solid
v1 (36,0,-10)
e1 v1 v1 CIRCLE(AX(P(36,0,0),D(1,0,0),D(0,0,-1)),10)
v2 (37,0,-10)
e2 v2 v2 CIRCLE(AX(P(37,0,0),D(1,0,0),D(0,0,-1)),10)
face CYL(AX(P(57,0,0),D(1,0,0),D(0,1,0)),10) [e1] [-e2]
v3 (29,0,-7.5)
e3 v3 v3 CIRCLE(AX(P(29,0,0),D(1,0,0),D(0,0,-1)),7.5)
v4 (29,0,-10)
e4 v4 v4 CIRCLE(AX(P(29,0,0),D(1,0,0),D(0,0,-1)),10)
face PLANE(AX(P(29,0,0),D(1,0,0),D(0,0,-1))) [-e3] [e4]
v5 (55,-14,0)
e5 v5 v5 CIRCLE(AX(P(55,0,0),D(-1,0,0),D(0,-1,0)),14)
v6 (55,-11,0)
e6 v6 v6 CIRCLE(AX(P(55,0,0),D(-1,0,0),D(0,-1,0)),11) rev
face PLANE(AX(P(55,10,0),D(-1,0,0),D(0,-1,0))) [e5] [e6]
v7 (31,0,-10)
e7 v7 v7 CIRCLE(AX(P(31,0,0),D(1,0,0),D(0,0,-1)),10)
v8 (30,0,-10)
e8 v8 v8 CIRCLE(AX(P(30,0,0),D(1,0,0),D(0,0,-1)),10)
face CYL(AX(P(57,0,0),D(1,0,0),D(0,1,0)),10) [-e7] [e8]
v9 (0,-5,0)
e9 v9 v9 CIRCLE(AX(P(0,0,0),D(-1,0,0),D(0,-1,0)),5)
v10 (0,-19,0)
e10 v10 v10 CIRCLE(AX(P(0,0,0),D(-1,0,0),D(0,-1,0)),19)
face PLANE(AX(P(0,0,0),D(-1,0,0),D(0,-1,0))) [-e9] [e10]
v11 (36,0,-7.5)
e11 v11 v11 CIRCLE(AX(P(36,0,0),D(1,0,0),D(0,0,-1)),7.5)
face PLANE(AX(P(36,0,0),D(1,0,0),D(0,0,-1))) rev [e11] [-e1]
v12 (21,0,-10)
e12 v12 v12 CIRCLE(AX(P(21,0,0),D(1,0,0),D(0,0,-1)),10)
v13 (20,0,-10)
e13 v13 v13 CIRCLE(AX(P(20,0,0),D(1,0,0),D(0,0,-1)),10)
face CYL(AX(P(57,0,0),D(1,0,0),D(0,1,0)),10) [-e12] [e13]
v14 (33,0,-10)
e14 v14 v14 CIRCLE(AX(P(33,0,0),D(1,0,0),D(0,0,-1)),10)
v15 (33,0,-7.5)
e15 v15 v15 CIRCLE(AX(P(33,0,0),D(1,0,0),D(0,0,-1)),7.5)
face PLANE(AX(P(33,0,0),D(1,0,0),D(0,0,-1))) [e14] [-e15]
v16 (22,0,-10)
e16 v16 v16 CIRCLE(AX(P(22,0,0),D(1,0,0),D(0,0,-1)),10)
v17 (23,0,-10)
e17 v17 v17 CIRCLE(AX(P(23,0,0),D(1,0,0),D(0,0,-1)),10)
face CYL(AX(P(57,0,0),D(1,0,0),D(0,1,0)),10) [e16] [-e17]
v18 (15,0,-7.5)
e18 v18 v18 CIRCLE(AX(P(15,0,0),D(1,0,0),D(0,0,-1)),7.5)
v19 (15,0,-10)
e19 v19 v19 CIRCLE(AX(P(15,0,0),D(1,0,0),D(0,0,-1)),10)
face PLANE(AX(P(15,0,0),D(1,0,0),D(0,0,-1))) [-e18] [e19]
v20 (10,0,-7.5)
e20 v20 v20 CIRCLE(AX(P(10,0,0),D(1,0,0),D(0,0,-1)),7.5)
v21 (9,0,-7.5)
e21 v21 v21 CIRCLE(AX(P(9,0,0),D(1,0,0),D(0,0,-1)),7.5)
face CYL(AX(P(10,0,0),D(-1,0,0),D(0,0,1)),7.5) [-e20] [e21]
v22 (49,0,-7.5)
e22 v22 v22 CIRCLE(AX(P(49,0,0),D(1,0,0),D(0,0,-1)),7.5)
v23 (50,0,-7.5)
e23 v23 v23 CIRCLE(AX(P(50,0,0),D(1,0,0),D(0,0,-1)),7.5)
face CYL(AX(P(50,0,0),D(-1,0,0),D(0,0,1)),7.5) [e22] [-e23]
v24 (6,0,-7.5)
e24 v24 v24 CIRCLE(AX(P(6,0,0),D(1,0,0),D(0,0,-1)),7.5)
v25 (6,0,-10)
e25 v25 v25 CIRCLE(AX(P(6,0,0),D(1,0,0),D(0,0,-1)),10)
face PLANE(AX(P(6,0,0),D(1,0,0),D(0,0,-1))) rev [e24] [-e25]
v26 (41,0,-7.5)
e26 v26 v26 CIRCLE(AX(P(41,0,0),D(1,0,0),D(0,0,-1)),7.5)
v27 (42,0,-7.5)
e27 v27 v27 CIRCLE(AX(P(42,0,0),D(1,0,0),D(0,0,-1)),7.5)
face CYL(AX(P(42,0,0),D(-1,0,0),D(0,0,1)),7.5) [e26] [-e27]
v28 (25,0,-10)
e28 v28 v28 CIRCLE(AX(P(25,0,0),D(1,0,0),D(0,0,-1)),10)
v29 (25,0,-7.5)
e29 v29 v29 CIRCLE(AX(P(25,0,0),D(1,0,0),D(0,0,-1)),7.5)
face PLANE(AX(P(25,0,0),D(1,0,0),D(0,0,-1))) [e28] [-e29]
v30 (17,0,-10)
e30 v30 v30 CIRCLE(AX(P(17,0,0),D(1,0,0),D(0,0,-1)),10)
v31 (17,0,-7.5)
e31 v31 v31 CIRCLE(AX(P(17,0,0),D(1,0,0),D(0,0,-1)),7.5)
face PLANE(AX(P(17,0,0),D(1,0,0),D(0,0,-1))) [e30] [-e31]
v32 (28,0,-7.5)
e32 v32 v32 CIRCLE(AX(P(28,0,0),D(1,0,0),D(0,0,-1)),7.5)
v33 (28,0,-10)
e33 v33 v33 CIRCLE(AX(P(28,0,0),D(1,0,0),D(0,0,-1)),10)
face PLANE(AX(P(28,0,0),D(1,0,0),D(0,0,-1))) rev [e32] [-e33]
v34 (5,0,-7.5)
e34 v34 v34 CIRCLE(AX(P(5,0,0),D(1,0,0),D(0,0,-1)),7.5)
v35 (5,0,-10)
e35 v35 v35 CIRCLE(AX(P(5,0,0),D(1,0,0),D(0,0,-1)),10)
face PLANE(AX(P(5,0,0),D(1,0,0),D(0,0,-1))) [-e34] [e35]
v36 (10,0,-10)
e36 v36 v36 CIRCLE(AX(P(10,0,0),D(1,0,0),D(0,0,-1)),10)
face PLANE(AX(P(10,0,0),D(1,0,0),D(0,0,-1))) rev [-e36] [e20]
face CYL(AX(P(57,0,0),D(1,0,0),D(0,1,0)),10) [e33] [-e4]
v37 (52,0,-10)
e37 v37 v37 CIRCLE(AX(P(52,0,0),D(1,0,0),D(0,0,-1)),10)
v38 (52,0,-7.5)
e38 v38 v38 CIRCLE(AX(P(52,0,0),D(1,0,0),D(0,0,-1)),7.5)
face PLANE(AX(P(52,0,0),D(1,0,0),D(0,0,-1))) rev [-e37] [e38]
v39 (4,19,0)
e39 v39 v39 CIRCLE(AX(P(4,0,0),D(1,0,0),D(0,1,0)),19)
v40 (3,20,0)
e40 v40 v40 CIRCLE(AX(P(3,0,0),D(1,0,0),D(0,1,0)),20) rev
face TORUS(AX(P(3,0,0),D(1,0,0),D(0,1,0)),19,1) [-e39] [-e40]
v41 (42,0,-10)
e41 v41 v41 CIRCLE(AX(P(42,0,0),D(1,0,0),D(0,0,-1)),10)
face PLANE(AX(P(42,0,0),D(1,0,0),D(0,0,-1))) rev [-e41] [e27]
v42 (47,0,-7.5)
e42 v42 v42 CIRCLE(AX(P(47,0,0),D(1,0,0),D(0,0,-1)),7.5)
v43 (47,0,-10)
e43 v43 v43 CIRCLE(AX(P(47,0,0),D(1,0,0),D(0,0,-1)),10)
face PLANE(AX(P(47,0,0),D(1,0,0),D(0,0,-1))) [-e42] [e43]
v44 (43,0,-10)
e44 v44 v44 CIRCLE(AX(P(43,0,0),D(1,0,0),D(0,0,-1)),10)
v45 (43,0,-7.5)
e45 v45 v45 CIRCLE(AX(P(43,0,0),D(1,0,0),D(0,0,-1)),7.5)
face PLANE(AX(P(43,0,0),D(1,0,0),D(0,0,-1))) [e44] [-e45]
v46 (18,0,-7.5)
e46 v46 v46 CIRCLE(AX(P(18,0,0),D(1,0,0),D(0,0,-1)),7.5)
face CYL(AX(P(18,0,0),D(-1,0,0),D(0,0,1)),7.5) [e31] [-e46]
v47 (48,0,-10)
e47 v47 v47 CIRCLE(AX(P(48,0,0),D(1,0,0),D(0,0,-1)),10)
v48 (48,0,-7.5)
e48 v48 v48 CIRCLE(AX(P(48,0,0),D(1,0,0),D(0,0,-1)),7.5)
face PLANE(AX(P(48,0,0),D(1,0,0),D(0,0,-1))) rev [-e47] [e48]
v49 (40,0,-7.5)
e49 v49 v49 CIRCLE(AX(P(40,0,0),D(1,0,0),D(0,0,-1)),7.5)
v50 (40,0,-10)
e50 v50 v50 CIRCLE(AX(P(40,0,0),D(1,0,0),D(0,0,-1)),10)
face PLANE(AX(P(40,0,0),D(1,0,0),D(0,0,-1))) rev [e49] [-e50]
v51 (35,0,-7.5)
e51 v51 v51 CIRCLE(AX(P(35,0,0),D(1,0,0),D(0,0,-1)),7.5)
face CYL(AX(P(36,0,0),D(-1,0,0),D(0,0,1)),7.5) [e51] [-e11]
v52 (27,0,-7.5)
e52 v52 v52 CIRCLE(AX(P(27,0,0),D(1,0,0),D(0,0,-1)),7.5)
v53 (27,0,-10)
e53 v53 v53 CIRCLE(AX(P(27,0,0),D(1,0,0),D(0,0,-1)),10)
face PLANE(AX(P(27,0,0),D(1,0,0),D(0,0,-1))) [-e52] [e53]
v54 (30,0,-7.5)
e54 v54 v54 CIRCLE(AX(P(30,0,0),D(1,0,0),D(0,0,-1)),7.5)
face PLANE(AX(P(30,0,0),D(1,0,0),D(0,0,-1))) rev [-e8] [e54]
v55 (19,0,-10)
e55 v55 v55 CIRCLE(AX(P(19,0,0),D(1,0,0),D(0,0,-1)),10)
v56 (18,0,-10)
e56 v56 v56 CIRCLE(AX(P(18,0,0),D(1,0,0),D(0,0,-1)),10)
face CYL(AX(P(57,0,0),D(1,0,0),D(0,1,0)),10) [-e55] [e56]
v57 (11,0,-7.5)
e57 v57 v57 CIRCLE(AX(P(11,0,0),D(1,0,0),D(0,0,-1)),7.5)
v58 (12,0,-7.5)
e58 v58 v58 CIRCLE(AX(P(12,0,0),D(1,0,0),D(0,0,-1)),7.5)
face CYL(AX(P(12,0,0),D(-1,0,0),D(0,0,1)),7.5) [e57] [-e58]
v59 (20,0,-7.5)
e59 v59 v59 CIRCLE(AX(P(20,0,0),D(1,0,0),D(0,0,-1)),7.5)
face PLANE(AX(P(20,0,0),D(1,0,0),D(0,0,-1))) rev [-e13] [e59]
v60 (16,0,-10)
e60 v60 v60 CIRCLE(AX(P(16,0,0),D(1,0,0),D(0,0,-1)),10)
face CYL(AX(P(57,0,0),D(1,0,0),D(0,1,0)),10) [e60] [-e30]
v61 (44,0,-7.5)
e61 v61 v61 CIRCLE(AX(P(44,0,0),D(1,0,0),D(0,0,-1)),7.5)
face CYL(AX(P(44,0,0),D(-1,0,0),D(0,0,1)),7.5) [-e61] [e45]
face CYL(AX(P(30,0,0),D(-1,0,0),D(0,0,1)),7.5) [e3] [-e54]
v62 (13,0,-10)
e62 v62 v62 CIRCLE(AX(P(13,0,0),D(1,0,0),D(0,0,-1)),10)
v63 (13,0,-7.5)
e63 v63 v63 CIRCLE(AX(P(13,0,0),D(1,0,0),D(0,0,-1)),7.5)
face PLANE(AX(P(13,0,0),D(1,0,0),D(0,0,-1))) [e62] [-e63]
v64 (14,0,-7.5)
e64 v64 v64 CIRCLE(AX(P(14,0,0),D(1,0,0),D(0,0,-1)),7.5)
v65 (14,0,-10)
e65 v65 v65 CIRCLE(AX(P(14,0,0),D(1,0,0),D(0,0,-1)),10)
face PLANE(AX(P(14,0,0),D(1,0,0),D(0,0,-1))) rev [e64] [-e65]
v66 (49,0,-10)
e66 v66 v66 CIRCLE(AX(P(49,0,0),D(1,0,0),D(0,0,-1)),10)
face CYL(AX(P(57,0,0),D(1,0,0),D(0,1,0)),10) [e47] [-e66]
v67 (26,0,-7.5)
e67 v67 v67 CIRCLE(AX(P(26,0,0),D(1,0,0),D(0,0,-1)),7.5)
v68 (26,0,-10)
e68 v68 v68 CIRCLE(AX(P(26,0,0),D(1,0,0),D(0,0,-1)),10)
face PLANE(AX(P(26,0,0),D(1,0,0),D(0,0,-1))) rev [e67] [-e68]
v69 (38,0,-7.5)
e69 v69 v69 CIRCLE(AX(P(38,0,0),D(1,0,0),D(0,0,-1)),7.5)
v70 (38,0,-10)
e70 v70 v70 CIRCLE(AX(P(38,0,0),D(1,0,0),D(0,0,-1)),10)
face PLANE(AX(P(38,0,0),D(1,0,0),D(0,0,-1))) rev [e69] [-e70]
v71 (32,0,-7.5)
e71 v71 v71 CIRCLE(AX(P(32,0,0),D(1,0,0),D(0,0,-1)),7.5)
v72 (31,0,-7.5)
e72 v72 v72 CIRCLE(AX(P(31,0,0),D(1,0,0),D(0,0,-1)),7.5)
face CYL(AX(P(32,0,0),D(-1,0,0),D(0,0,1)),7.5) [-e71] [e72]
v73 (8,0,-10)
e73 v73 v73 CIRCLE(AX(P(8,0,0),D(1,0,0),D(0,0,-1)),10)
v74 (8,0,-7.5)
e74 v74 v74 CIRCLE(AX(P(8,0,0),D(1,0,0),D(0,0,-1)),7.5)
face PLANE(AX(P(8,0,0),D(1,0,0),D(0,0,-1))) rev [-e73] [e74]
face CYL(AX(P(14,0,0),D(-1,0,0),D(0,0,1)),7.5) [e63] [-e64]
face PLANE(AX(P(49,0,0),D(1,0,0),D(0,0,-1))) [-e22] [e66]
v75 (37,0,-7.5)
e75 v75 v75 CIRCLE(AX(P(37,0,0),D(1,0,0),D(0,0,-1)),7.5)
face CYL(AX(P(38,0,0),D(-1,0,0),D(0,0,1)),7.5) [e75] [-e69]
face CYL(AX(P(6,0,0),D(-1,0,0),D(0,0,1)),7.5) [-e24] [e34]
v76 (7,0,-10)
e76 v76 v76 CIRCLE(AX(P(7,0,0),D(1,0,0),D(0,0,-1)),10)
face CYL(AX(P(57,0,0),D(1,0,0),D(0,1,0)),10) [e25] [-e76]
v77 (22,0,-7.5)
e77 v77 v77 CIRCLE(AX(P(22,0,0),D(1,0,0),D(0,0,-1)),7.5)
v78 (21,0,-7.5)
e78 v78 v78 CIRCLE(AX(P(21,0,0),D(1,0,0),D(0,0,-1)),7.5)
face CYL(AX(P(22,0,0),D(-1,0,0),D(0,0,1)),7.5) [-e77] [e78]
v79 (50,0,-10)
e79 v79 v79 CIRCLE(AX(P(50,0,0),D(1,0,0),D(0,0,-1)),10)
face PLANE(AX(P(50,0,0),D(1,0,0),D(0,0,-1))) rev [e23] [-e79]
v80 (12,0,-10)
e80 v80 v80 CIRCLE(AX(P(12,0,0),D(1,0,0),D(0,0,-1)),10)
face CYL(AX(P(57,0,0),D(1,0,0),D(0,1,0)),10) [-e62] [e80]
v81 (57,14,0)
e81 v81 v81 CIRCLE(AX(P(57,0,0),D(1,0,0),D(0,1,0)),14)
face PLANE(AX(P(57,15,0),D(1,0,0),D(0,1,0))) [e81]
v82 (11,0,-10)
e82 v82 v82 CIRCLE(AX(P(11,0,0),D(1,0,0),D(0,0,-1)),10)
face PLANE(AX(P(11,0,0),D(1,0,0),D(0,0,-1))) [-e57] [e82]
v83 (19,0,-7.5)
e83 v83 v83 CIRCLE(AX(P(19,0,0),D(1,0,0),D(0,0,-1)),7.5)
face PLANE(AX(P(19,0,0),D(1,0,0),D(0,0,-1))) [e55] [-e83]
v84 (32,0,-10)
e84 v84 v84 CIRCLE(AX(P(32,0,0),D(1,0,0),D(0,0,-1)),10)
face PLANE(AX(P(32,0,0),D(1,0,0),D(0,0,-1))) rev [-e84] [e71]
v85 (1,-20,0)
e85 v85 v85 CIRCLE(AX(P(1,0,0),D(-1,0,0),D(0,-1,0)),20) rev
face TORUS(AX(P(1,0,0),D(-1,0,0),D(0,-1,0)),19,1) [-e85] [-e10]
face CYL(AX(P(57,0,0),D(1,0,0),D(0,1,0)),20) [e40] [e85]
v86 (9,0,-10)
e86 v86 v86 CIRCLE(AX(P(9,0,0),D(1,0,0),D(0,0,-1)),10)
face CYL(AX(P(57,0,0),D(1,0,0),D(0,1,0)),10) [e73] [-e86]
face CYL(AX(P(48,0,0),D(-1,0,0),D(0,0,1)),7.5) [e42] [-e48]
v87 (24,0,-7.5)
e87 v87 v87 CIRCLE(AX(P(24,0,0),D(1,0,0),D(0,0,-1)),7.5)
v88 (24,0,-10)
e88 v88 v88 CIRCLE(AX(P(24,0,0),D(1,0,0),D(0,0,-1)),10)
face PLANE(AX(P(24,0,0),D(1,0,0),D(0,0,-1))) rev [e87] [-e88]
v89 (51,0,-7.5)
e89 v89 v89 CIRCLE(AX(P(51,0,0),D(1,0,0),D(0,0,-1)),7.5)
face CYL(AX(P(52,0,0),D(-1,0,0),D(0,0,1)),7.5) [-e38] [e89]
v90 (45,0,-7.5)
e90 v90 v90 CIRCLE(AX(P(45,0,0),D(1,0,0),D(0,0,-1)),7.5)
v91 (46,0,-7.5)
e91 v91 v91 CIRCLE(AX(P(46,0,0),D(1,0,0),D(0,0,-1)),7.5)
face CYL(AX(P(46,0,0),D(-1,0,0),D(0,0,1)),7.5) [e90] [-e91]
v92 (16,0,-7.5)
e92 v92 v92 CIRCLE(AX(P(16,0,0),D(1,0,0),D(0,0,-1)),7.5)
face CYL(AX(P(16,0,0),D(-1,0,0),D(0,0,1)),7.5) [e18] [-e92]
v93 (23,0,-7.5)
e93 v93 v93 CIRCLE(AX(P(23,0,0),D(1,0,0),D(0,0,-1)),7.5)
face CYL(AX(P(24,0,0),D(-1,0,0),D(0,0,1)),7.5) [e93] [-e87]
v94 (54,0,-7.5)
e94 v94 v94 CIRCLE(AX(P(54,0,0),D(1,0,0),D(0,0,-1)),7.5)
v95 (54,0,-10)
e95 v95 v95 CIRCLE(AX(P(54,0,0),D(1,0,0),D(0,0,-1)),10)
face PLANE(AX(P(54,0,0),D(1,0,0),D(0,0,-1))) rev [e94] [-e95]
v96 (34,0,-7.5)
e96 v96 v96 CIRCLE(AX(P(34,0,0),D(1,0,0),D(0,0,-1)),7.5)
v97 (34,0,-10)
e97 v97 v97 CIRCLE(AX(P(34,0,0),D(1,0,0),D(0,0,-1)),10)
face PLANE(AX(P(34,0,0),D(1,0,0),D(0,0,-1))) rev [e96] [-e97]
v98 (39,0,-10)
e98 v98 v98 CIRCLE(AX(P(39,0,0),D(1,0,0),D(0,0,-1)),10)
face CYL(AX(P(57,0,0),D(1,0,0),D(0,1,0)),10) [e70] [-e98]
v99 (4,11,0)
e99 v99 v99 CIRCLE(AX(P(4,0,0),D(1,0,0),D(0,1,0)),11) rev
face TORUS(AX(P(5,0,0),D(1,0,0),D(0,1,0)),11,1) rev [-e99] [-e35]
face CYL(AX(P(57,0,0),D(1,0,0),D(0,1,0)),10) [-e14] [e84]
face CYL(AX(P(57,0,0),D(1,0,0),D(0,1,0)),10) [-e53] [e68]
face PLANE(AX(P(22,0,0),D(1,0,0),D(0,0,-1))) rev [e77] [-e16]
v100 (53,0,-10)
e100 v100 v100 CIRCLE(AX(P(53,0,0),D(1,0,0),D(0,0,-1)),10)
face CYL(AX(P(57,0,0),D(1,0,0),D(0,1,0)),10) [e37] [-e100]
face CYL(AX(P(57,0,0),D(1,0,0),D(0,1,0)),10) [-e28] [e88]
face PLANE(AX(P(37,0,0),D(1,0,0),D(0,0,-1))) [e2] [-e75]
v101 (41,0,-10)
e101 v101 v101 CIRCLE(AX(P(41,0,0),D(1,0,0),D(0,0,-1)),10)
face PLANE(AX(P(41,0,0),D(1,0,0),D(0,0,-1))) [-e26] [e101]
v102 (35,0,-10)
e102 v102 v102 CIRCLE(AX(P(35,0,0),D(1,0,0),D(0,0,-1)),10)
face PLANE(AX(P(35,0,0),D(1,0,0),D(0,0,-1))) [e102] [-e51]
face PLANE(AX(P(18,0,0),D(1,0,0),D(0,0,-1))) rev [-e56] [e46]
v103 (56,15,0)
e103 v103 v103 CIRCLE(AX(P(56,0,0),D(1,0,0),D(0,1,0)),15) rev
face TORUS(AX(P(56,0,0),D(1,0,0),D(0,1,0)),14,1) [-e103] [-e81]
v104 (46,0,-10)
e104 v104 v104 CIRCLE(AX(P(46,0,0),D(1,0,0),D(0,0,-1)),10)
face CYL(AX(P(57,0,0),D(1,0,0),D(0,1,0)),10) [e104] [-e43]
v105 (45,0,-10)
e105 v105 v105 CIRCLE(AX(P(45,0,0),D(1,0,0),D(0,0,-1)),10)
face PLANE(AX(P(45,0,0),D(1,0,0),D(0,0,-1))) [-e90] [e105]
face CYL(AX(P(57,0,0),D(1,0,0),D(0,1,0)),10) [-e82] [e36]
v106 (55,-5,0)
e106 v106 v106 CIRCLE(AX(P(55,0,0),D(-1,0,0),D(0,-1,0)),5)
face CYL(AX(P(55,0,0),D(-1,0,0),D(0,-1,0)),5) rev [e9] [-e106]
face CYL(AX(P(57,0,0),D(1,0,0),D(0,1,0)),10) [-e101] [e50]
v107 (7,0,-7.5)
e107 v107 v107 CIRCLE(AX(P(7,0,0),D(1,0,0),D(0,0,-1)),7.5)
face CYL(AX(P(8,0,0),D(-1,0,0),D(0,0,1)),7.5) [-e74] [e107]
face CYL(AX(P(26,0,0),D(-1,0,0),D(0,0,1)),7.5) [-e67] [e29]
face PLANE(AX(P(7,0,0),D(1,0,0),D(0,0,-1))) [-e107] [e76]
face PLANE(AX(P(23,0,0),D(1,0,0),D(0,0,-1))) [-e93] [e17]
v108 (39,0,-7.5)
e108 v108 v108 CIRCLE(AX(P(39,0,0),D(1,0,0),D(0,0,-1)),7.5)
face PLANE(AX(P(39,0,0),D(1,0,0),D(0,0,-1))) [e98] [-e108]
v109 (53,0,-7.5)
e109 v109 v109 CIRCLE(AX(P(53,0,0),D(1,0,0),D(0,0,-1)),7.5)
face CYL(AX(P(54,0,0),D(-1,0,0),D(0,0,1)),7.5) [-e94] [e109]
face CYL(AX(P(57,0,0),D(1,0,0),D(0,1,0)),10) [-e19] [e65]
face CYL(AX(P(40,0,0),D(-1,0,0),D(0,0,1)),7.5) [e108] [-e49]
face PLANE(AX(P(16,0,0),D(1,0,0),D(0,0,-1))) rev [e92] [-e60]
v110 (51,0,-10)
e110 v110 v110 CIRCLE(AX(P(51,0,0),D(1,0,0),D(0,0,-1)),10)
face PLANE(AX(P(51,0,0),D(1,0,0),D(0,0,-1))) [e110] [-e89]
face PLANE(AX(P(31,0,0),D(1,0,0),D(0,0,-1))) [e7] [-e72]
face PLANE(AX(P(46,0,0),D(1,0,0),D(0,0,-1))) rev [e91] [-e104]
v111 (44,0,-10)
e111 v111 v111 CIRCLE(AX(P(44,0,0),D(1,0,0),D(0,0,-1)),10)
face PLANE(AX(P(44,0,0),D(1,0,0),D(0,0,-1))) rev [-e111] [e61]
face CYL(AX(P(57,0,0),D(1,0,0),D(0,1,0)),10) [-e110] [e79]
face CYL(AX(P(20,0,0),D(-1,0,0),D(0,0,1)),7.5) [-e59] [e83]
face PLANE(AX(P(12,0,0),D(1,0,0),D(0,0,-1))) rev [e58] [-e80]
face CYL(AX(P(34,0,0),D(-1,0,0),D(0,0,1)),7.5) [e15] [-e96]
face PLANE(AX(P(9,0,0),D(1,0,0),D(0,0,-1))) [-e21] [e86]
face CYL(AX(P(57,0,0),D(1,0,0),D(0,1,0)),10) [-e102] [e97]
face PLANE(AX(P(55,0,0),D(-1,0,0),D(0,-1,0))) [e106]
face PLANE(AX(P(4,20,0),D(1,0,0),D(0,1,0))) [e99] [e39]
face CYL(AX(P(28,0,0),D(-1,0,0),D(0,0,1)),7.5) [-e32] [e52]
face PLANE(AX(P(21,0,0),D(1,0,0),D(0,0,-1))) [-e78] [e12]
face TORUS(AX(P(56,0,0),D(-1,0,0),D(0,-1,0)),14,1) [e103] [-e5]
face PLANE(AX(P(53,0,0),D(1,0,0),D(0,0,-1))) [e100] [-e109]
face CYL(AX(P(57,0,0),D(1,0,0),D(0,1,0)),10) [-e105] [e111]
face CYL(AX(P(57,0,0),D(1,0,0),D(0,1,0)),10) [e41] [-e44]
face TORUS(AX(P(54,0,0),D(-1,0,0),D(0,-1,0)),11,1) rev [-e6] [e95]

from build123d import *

# Parameters (mm, degrees)
FILLET1_R           = 1
FILLET2_R           = 1
FILLET3_R           = 1
CUT_EXTRUDE12_START = 1
SKETCH3_R           = 10
SKETCH3_R_2         = 7.5
CUT_EXTRUDE12_DEPTH = 1
LPATTERN1_COUNT     = 25
LPATTERN1_PITCH     = 2
SKETCH5_R           = 5
CUT_EXTRUDE13_DEPTH = 55


with BuildPart() as part:
    # Sketch1 → Revolve2 (revolve)
    with BuildSketch(Plane.XY):
        Polygon((0, 0), (0, 20), (4, 20), (4, 10), (55, 10), (55, 15), (57, 15), (57, 0), align=None)
    revolve(axis=Axis((57, 0, 0), (-1, 0, 0)))

    # Fillet1
    fillet1_edges = [part.edges().sort_by_distance(p)[0] for p in [
        (57, -15, 0),
        (55, -15, 0),
    ]]
    fillet(fillet1_edges, radius=FILLET1_R - 0.0001)  # a hair under: the kernel refuses the full size

    # Fillet2
    fillet2_edges = [part.edges().sort_by_distance(p)[0] for p in [
        (4, -20, 0),
        (0, -20, 0),
    ]]
    fillet(fillet2_edges, radius=FILLET2_R)

    # Fillet3
    fillet3_edges = [part.edges().sort_by_distance(p)[0] for p in [
        (55, -10, 0),
        (4, -10, 0),
    ]]
    fillet(fillet3_edges, radius=FILLET3_R)

    # Sketch3 → Cut-Extrude12 (cut)
    with BuildSketch(Plane(origin=(5, 0, 0), x_dir=(0, 0, -1), z_dir=(1, 0, 0)).offset(CUT_EXTRUDE12_START)):
        Circle(SKETCH3_R)
        Circle(SKETCH3_R_2, mode=Mode.SUBTRACT)
    cut_extrude12 = extrude(amount=-CUT_EXTRUDE12_DEPTH, mode=Mode.SUBTRACT)

    # LPattern1: Cut-Extrude12 ×25
    with Locations(*[(i * LPATTERN1_PITCH, 0, 0) for i in range(1, LPATTERN1_COUNT)]):
        add(cut_extrude12, mode=Mode.SUBTRACT)

    # Sketch5 → Cut-Extrude13 (cut)
    with BuildSketch(Plane.ZY):
        with Locations(Location((0, 0, 0), (0, 0, 270))):
            Circle(SKETCH5_R)
    extrude(amount=-CUT_EXTRUDE13_DEPTH, mode=Mode.SUBTRACT)


solid = part.part
